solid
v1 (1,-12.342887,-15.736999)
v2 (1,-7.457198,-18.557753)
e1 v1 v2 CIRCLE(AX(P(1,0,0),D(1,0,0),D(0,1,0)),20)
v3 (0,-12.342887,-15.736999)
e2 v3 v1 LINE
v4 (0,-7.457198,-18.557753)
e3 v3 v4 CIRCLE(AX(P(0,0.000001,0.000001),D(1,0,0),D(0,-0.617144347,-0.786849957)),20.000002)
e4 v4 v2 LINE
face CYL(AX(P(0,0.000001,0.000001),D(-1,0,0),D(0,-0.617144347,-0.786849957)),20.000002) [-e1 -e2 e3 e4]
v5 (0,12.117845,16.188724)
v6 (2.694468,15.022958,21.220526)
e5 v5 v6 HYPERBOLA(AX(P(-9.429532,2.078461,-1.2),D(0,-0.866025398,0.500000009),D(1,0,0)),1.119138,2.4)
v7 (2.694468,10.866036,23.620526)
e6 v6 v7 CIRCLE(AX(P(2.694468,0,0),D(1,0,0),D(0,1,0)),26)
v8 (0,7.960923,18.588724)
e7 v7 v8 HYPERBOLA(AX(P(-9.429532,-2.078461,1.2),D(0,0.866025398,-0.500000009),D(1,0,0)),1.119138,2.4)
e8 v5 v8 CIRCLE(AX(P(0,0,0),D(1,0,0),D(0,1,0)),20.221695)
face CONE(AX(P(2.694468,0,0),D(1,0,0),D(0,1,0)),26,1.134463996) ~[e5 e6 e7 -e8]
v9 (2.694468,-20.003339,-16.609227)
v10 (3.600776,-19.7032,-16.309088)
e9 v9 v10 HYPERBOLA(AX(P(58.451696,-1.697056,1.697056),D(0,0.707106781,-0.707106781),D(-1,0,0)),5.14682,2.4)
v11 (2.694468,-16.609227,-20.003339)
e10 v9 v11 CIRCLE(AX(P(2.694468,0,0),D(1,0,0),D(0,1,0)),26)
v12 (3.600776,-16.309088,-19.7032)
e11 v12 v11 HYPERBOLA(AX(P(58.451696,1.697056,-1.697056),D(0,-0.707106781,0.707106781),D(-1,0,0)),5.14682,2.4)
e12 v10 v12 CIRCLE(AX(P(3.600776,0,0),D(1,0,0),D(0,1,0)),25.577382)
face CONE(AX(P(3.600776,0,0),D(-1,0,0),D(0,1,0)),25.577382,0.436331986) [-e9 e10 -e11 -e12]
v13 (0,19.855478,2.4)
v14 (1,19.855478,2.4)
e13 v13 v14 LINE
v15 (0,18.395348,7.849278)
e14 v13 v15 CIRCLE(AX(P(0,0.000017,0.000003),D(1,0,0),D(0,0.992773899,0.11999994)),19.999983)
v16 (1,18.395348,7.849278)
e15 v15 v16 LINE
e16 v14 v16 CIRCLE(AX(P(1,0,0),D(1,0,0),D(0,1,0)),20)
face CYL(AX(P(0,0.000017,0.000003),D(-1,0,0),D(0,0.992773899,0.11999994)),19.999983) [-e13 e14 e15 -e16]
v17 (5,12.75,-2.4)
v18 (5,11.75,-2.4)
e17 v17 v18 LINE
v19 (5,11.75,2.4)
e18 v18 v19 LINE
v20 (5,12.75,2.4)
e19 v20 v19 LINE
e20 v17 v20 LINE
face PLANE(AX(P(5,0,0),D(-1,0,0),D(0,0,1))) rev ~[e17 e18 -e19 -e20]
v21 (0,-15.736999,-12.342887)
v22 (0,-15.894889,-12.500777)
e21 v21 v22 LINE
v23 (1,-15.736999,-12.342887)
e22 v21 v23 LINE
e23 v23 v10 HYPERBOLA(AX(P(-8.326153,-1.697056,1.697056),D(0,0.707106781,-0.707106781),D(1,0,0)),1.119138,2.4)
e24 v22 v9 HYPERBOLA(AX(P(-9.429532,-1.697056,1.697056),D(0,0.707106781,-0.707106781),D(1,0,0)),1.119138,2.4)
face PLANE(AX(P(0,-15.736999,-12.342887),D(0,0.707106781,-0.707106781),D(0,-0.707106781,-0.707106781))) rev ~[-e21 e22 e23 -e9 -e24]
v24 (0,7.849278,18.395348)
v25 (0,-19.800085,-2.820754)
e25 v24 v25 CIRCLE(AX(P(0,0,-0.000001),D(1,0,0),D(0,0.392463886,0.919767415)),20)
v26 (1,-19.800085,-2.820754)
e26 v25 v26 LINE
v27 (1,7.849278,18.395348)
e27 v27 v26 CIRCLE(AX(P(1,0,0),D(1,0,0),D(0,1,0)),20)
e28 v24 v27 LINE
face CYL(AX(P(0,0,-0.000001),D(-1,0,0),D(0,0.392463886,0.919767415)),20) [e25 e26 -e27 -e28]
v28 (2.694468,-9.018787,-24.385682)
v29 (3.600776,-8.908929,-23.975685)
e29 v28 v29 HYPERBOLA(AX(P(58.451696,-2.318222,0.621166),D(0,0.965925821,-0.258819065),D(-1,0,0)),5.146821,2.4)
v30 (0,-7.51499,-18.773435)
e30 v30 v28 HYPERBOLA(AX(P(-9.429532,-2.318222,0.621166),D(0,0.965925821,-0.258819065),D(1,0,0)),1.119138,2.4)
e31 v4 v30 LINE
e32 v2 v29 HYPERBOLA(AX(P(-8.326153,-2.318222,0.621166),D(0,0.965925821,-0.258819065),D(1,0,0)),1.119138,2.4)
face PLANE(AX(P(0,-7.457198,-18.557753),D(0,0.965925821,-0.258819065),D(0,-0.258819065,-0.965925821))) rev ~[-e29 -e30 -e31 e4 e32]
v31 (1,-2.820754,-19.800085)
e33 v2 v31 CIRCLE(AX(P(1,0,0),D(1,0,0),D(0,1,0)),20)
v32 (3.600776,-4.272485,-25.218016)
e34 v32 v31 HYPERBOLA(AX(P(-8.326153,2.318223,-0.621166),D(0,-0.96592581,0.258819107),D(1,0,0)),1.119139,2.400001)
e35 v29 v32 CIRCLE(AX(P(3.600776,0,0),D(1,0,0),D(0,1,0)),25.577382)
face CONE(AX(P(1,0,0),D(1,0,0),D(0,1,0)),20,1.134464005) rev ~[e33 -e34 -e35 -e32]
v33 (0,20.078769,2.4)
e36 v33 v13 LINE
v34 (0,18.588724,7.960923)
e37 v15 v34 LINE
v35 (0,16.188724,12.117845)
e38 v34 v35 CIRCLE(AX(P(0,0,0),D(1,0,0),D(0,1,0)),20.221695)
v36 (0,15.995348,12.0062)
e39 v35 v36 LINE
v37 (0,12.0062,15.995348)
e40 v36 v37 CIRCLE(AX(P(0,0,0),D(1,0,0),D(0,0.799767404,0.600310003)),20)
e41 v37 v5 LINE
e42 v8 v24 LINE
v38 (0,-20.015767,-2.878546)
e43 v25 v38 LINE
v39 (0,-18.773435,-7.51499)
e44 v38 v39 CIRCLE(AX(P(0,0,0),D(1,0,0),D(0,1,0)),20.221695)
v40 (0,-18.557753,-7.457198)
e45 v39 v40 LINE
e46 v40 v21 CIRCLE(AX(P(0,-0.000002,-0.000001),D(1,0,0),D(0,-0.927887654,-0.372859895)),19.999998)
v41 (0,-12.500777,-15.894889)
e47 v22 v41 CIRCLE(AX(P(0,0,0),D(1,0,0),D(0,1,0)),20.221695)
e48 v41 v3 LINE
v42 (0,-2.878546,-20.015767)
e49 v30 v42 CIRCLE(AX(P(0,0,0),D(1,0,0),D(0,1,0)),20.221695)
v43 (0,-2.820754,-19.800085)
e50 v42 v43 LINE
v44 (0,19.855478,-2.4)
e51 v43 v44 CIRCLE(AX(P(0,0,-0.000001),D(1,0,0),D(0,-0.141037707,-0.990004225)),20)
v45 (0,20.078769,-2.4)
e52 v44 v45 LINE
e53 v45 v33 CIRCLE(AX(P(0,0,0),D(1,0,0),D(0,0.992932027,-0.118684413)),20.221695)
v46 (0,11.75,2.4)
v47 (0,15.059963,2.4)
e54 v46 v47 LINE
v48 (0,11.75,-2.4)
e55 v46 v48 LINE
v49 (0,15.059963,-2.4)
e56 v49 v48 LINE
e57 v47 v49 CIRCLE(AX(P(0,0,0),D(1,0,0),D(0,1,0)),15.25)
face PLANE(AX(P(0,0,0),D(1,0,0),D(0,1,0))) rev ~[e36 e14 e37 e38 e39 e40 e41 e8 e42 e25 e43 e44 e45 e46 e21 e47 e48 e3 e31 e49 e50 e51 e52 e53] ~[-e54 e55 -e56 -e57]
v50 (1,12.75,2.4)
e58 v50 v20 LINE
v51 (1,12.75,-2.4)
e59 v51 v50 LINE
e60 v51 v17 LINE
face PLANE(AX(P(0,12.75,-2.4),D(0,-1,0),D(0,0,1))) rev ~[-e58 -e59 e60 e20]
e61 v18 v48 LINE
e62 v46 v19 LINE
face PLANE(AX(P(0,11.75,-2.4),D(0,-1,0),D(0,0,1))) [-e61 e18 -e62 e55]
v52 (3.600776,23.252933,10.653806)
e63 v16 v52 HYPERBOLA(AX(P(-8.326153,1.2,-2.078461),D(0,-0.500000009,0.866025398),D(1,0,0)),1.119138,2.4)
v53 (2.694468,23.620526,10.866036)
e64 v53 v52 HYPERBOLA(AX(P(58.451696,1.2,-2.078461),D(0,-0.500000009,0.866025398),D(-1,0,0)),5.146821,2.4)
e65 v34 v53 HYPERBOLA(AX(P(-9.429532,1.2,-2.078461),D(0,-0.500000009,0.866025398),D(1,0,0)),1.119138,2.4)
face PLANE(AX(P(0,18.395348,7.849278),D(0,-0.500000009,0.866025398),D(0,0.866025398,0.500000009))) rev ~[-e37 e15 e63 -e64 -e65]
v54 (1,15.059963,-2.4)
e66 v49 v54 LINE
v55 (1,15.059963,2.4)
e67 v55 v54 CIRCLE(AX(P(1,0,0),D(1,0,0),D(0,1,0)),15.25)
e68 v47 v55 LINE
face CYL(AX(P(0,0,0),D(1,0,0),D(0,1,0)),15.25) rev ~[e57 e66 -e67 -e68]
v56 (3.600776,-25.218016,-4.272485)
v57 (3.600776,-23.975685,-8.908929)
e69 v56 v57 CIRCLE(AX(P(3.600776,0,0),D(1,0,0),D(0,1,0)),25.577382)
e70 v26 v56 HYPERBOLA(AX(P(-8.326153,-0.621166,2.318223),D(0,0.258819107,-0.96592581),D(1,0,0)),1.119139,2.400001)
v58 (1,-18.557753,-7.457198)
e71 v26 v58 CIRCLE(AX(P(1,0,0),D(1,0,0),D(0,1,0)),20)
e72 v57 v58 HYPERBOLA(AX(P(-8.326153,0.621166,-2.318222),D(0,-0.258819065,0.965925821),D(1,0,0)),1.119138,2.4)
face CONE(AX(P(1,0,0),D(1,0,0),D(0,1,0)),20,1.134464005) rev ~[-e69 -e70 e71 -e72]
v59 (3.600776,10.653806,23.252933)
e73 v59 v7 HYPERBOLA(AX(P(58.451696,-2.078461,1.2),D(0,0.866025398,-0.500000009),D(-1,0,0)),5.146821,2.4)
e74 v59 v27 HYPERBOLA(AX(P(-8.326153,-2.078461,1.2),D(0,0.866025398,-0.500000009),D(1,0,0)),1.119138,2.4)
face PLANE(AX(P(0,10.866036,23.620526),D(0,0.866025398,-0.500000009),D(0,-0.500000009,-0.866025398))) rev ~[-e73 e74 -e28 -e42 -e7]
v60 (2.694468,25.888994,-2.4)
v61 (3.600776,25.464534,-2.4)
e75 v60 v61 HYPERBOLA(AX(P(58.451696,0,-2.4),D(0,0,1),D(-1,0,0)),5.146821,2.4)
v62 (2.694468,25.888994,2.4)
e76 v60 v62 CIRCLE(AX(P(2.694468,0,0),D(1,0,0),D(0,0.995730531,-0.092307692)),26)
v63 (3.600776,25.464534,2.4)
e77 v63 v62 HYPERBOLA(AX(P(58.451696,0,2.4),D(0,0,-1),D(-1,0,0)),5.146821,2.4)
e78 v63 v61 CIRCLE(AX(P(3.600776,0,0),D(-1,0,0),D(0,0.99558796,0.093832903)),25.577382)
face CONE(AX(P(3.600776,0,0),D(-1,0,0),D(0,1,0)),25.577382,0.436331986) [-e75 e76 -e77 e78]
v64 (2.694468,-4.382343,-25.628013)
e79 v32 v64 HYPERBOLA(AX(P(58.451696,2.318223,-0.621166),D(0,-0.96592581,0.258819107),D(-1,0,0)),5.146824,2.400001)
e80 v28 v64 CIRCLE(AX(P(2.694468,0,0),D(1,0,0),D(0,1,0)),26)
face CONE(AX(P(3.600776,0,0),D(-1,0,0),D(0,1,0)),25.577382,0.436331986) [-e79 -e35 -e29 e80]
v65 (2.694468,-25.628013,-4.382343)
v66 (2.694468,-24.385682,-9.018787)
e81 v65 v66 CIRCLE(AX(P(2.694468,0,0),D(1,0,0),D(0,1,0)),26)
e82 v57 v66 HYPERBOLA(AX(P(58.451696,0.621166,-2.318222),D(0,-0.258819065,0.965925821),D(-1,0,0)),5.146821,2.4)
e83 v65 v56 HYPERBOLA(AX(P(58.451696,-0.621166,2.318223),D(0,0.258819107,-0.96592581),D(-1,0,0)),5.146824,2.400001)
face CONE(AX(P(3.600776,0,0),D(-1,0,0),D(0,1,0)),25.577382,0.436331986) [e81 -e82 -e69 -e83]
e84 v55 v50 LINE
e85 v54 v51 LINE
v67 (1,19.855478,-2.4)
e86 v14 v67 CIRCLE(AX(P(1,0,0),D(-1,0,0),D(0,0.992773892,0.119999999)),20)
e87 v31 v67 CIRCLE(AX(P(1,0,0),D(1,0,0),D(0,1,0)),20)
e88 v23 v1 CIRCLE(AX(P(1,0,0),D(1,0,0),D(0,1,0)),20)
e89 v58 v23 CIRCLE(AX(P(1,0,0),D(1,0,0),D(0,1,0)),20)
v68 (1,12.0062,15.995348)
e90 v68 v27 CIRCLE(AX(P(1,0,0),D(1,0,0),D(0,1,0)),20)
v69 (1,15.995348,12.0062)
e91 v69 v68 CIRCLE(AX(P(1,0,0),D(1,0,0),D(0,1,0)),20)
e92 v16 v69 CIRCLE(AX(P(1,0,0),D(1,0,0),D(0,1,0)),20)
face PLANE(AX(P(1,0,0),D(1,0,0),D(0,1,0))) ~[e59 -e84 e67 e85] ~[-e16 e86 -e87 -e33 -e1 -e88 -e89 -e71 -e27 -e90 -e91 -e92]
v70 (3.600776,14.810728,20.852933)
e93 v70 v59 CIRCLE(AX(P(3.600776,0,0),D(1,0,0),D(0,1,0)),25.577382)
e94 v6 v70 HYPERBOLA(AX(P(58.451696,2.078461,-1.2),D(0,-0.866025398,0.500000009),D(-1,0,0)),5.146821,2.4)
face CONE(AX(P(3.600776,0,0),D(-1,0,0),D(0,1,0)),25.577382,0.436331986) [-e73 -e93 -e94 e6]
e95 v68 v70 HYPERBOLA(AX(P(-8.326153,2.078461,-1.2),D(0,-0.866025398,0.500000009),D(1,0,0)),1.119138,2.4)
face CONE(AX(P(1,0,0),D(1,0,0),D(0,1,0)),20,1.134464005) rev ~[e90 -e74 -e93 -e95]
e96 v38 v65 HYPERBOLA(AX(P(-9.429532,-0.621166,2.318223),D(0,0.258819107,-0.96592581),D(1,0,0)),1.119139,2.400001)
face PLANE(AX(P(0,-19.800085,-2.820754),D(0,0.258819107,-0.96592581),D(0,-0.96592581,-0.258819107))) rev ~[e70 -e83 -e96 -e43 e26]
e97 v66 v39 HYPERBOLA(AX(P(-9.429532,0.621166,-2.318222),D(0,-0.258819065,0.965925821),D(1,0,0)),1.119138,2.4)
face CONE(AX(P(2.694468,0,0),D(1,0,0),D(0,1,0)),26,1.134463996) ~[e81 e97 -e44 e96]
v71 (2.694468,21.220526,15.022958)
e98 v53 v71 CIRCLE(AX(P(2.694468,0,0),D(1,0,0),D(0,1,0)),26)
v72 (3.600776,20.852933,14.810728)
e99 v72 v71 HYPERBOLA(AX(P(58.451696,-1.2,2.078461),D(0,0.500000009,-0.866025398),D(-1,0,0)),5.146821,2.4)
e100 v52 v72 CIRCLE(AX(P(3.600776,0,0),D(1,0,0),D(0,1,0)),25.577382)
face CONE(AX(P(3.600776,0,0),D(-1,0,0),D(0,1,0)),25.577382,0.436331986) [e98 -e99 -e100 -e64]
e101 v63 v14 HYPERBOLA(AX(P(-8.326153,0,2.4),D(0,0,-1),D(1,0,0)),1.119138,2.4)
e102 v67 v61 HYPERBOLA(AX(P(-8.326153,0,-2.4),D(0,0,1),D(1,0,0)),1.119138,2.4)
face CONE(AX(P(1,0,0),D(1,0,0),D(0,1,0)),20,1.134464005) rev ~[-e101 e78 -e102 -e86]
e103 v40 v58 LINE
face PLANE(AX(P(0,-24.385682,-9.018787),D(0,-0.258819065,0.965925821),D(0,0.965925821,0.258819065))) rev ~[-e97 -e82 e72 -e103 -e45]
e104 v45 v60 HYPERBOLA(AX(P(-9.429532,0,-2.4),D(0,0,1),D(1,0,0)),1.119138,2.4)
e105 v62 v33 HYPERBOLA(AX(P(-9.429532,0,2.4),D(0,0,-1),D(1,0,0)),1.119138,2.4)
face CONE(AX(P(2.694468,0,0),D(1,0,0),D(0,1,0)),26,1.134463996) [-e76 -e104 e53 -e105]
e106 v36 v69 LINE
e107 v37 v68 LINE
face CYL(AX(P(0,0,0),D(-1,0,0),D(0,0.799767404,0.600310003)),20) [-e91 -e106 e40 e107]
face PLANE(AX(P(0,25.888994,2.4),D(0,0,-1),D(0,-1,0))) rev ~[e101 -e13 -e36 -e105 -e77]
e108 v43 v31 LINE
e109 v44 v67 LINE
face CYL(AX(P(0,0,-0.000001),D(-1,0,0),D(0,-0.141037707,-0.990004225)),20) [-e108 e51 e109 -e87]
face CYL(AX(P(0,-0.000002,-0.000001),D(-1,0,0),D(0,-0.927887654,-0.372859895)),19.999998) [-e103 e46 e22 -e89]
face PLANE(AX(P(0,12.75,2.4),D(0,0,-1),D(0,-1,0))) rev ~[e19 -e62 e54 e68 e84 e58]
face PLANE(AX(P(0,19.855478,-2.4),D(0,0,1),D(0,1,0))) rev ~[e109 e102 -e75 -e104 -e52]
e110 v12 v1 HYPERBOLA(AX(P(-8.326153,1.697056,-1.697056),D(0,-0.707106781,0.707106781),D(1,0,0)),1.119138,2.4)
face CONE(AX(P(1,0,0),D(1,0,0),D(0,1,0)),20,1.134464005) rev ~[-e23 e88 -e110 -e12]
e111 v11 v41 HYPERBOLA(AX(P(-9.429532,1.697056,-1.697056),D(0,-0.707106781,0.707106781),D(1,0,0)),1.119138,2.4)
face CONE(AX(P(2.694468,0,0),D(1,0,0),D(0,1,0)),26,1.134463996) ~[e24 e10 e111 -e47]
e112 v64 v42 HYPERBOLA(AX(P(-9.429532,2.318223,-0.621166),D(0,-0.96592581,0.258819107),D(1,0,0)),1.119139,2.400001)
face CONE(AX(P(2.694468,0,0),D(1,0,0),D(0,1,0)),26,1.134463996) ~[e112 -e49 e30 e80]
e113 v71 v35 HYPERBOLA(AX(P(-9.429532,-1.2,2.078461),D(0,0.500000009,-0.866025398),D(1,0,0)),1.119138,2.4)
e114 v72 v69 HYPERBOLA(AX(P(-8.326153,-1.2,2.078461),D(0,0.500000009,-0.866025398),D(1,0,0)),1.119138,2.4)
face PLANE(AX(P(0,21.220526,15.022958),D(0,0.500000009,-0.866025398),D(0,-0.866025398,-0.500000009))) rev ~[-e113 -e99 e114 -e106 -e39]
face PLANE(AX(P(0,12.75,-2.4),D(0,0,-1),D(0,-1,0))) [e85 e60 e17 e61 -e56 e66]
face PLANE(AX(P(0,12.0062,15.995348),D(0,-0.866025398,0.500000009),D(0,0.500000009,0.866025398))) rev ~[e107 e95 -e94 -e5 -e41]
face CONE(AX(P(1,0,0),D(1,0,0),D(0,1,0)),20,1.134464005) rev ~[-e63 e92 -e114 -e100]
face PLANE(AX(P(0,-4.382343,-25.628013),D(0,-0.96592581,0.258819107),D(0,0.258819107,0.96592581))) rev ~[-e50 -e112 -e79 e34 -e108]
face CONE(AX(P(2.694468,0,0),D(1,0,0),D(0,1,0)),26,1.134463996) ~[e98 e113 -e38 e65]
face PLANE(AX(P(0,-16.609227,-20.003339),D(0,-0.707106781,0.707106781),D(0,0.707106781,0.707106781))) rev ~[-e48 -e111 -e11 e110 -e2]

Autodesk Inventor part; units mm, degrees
ref_plane "YZ Plane" through (0, 0, 0) normal (1, 0, 0) x (0, 1, 0)
ref_plane "XZ Plane" through (0, 0, 0) normal (0, 1, 0) x (-1, 0, 0)
sketch "草图1" plane through (0, 0, 0) normal (0, 0, 1) x (1, 0, 0)
  line L0 (-0.580263, 0) -> (3.481577, 0)
  line L1 (0, 3.8) -> (0, 13.95)
  line L2 (0, 20.221695) -> (2.694468, 26)
  line L3 (2.694468, 26) -> (3.600776, 25.577382)
  line L4 (3.600776, 25.577382) -> (1, 20)
  line L5 (1, 20) -> (1, 15.25)
  line L6 (1, 15.25) -> (0, 15.25)
  dimension "d1" = 1
  dimension "d2" = 30.5
  dimension "d3" = 40
  dimension "d4" = 52
  dimension "d5" = 25
  dimension "d6" = 1
sketch "草图1 outline for 轴承体" plane through (0, 0, 0) normal (0, 0, 1) x (1, 0, 0)
  line L0 (2.694468, 26) -> (0, 20.221695)
  line L1 (3.600776, 25.577382) -> (2.694468, 26)
  line L2 (1, 20) -> (3.600776, 25.577382)
  line L3 (1, 15.25) -> (1, 20)
  line L4 (0, 15.25) -> (1, 15.25)
  line L5 (0, 20.221695) -> (0, 15.25)
revolve "轴承体" add sketch "草图1 outline for 轴承体" angle 360 about axis through (-10, 0, 0) along (1, 0, 0)
sketch "草图2" plane through (0, 0, 0) normal (-1, 0, 0) x (0, 0, 1)
  line L0 (0, -36.4) -> (0, 36.4)
  line L1 (2.4, 15.059963) -> (2.4, 11.75)
  line L2 (2.4, 11.75) -> (0, 11.75)
  line L3 (-2.4, 15.059963) -> (-2.4, 11.75)
  line L4 (-2.4, 11.75) -> (0, 11.75)
  line L5 (-36.4, 0) -> (36.4, 0)
  circle A0 centre (0, 0) radius 15.25
  circle A1 centre (0, 0) radius 26
  circle A2 centre (0, 0) radius 20
  line L6 (-2.4, 12.75) -> (2.4, 12.75)
  circle A3 centre (0, 0) radius 20.221695
  line L7 (2.4, 19.855478) -> (2.4, 25.888994)
  line L8 (0, 36.4) -> (0, -36.4)
  line L9 (0, 0) -> (13, 22.51666) construction
  line L10 (7.849278, 18.395348) -> (10.866036, 23.620526)
  line L11 (12.0062, 15.995348) -> (15.022958, 21.220526)
  line L12 (-2.4, 19.855478) -> (-2.4, 25.888994)
  line L13 (0, 0) -> (22.51666, 13) construction
  line L14 (15.995348, 12.0062) -> (21.220526, 15.022958)
  line L15 (18.395348, 7.849278) -> (23.620526, 10.866036)
  line L16 (0, 0) -> (-25.114071, -6.729295) construction
  line L17 (-19.800085, -2.820754) -> (-25.628013, -4.382343)
  line L18 (-18.557753, -7.457198) -> (-24.385682, -9.018787)
  line L19 (0, 0) -> (-18.384776, -18.384776) construction
  line L20 (0, 0) -> (-6.729295, -25.114071) construction
  line L21 (-15.736999, -12.342887) -> (-20.003339, -16.609227)
  line L22 (-12.342887, -15.736999) -> (-16.609227, -20.003339)
  line L23 (-7.457198, -18.557753) -> (-9.018787, -24.385682)
  line L24 (-2.820754, -19.800085) -> (-4.382343, -25.628013)
  dimension "d9" = 4.8
  dimension "d21" = 1
  dimension "d25" = 27
  dimension "d32" = 4.8
  dimension "d34" = 4.8
  dimension "d36" = 30
  dimension "d38" = 2.4
  dimension "d39" = 30
  dimension "d40" = 15
  dimension "d41" = 4.8
  dimension "d42" = 30
  dimension "d43" = 30
  dimension "d45" = 4.8
  dimension "d47" = 4.8
sketch "草图2 outline for 切口" plane through (0, 0, 0) normal (-1, 0, 0) x (0, 0, 1)
  arc A0 (-7.457198, -18.557753) -> (-12.342887, -15.736999) centre (0, 0) cw
  line L0 (-9.018787, -24.385682) -> (-7.457198, -18.557753)
  arc A1 (-16.609227, -20.003339) -> (-9.018787, -24.385682) centre (0, 0) ccw
  line L1 (-12.342887, -15.736999) -> (-16.609227, -20.003339)
  arc A2 (-15.736999, -12.342887) -> (-18.557753, -7.457198) centre (0, 0) cw
  line L2 (-20.003339, -16.609227) -> (-15.736999, -12.342887)
  arc A3 (-24.385682, -9.018787) -> (-20.003339, -16.609227) centre (0, 0) ccw
  line L3 (-18.557753, -7.457198) -> (-24.385682, -9.018787)
  line L4 (2.4, 25.888994) -> (2.4, 19.855478)
  arc A4 (10.866036, 23.620526) -> (2.4, 25.888994) centre (0, 0) ccw
  line L5 (7.849278, 18.395348) -> (10.866036, 23.620526)
  arc A5 (2.4, 19.855478) -> (7.849278, 18.395348) centre (0, 0) cw
  line L6 (15.022958, 21.220526) -> (12.0062, 15.995348)
  arc A6 (21.220526, 15.022958) -> (15.022958, 21.220526) centre (0, 0) ccw
  line L7 (15.995348, 12.0062) -> (21.220526, 15.022958)
  arc A7 (12.0062, 15.995348) -> (15.995348, 12.0062) centre (0, 0) cw
  arc A8 (-19.800085, -2.820754) -> (-2.4, 19.855478) centre (0, 0) cw
  line L8 (-25.628013, -4.382343) -> (-19.800085, -2.820754)
  arc A9 (-2.4, 25.888994) -> (-25.628013, -4.382343) centre (0, 0) ccw
  line L9 (-2.4, 19.855478) -> (-2.4, 25.888994)
  line L10 (23.620526, 10.866036) -> (18.395348, 7.849278)
  arc A10 (-4.382343, -25.628013) -> (23.620526, 10.866036) centre (0, 0) ccw
  line L11 (-2.820754, -19.800085) -> (-4.382343, -25.628013)
  arc A11 (18.395348, 7.849278) -> (-2.820754, -19.800085) centre (0, 0) cw
extrude "切口" cut sketch "草图2 outline for 切口" against normal through all
extrude "榫1" add sketch "草图2" against normal blind 1 contours L4 L3 L6 L0 | L0 L6 L1 L2 | A0 L0 L6 L3 | L1 L6 L0 A0
extrude "榫2" add sketch "草图2" against normal blind 5 contours L4 L3 L6 L0 | L0 L6 L1 L2
ref_plane "Work Plane1" through (0.5, 0, 0) normal (0, 0, -1) x (1, 0, 0)
equation "\"d1\" = SD"
equation "\"d2\" = SD1"
equation "\"d3\" = LADI"
equation "\"d4\" = SD2"
equation "\"d5\" = FAWI"
equation "\"d6\" = SD"
equation "\"d9\" = TW0"
equation "\"d21\" = SD"
equation "\"d25\" = SD3"
equation "\"d32\" = TW0"
equation "\"d34\" = TW0"
equation "\"d36\" = SEWI"
equation "\"d39\" = SEWI"
equation "\"d40\" = ANG1"
equation "\"d41\" = TW0"
equation "\"d42\" = SEWI"
equation "\"d43\" = SEWI"
equation "\"d45\" = TW0"
equation "\"d47\" = TW0"
equation "\"d17\" = SD"
equation "\"d13\" = SD"
equation "\"d23\" = TL1"
equation "\"FAWI\" = 25deg"
equation "\"SD1\" = 30.5"
equation "\"SD2\" = 52"
equation "\"SD\" = 1"
equation "\"TW0\" = 4.8"
equation "\"LADI\" = 40"
equation "\"d8\" = SD1"
equation "\"TL1\" = 5"
equation "\"SD3\" = 27"
equation "\"SEWI\" = 30deg"
equation "\"ANG1\" = 15deg"
equation "\"RR\" = 0.1"
equation "\"PB\" = TW0"
equation "\"PNT\" = TL1"
properties part number "垫圈 GB 858 30" material "钢，软"
